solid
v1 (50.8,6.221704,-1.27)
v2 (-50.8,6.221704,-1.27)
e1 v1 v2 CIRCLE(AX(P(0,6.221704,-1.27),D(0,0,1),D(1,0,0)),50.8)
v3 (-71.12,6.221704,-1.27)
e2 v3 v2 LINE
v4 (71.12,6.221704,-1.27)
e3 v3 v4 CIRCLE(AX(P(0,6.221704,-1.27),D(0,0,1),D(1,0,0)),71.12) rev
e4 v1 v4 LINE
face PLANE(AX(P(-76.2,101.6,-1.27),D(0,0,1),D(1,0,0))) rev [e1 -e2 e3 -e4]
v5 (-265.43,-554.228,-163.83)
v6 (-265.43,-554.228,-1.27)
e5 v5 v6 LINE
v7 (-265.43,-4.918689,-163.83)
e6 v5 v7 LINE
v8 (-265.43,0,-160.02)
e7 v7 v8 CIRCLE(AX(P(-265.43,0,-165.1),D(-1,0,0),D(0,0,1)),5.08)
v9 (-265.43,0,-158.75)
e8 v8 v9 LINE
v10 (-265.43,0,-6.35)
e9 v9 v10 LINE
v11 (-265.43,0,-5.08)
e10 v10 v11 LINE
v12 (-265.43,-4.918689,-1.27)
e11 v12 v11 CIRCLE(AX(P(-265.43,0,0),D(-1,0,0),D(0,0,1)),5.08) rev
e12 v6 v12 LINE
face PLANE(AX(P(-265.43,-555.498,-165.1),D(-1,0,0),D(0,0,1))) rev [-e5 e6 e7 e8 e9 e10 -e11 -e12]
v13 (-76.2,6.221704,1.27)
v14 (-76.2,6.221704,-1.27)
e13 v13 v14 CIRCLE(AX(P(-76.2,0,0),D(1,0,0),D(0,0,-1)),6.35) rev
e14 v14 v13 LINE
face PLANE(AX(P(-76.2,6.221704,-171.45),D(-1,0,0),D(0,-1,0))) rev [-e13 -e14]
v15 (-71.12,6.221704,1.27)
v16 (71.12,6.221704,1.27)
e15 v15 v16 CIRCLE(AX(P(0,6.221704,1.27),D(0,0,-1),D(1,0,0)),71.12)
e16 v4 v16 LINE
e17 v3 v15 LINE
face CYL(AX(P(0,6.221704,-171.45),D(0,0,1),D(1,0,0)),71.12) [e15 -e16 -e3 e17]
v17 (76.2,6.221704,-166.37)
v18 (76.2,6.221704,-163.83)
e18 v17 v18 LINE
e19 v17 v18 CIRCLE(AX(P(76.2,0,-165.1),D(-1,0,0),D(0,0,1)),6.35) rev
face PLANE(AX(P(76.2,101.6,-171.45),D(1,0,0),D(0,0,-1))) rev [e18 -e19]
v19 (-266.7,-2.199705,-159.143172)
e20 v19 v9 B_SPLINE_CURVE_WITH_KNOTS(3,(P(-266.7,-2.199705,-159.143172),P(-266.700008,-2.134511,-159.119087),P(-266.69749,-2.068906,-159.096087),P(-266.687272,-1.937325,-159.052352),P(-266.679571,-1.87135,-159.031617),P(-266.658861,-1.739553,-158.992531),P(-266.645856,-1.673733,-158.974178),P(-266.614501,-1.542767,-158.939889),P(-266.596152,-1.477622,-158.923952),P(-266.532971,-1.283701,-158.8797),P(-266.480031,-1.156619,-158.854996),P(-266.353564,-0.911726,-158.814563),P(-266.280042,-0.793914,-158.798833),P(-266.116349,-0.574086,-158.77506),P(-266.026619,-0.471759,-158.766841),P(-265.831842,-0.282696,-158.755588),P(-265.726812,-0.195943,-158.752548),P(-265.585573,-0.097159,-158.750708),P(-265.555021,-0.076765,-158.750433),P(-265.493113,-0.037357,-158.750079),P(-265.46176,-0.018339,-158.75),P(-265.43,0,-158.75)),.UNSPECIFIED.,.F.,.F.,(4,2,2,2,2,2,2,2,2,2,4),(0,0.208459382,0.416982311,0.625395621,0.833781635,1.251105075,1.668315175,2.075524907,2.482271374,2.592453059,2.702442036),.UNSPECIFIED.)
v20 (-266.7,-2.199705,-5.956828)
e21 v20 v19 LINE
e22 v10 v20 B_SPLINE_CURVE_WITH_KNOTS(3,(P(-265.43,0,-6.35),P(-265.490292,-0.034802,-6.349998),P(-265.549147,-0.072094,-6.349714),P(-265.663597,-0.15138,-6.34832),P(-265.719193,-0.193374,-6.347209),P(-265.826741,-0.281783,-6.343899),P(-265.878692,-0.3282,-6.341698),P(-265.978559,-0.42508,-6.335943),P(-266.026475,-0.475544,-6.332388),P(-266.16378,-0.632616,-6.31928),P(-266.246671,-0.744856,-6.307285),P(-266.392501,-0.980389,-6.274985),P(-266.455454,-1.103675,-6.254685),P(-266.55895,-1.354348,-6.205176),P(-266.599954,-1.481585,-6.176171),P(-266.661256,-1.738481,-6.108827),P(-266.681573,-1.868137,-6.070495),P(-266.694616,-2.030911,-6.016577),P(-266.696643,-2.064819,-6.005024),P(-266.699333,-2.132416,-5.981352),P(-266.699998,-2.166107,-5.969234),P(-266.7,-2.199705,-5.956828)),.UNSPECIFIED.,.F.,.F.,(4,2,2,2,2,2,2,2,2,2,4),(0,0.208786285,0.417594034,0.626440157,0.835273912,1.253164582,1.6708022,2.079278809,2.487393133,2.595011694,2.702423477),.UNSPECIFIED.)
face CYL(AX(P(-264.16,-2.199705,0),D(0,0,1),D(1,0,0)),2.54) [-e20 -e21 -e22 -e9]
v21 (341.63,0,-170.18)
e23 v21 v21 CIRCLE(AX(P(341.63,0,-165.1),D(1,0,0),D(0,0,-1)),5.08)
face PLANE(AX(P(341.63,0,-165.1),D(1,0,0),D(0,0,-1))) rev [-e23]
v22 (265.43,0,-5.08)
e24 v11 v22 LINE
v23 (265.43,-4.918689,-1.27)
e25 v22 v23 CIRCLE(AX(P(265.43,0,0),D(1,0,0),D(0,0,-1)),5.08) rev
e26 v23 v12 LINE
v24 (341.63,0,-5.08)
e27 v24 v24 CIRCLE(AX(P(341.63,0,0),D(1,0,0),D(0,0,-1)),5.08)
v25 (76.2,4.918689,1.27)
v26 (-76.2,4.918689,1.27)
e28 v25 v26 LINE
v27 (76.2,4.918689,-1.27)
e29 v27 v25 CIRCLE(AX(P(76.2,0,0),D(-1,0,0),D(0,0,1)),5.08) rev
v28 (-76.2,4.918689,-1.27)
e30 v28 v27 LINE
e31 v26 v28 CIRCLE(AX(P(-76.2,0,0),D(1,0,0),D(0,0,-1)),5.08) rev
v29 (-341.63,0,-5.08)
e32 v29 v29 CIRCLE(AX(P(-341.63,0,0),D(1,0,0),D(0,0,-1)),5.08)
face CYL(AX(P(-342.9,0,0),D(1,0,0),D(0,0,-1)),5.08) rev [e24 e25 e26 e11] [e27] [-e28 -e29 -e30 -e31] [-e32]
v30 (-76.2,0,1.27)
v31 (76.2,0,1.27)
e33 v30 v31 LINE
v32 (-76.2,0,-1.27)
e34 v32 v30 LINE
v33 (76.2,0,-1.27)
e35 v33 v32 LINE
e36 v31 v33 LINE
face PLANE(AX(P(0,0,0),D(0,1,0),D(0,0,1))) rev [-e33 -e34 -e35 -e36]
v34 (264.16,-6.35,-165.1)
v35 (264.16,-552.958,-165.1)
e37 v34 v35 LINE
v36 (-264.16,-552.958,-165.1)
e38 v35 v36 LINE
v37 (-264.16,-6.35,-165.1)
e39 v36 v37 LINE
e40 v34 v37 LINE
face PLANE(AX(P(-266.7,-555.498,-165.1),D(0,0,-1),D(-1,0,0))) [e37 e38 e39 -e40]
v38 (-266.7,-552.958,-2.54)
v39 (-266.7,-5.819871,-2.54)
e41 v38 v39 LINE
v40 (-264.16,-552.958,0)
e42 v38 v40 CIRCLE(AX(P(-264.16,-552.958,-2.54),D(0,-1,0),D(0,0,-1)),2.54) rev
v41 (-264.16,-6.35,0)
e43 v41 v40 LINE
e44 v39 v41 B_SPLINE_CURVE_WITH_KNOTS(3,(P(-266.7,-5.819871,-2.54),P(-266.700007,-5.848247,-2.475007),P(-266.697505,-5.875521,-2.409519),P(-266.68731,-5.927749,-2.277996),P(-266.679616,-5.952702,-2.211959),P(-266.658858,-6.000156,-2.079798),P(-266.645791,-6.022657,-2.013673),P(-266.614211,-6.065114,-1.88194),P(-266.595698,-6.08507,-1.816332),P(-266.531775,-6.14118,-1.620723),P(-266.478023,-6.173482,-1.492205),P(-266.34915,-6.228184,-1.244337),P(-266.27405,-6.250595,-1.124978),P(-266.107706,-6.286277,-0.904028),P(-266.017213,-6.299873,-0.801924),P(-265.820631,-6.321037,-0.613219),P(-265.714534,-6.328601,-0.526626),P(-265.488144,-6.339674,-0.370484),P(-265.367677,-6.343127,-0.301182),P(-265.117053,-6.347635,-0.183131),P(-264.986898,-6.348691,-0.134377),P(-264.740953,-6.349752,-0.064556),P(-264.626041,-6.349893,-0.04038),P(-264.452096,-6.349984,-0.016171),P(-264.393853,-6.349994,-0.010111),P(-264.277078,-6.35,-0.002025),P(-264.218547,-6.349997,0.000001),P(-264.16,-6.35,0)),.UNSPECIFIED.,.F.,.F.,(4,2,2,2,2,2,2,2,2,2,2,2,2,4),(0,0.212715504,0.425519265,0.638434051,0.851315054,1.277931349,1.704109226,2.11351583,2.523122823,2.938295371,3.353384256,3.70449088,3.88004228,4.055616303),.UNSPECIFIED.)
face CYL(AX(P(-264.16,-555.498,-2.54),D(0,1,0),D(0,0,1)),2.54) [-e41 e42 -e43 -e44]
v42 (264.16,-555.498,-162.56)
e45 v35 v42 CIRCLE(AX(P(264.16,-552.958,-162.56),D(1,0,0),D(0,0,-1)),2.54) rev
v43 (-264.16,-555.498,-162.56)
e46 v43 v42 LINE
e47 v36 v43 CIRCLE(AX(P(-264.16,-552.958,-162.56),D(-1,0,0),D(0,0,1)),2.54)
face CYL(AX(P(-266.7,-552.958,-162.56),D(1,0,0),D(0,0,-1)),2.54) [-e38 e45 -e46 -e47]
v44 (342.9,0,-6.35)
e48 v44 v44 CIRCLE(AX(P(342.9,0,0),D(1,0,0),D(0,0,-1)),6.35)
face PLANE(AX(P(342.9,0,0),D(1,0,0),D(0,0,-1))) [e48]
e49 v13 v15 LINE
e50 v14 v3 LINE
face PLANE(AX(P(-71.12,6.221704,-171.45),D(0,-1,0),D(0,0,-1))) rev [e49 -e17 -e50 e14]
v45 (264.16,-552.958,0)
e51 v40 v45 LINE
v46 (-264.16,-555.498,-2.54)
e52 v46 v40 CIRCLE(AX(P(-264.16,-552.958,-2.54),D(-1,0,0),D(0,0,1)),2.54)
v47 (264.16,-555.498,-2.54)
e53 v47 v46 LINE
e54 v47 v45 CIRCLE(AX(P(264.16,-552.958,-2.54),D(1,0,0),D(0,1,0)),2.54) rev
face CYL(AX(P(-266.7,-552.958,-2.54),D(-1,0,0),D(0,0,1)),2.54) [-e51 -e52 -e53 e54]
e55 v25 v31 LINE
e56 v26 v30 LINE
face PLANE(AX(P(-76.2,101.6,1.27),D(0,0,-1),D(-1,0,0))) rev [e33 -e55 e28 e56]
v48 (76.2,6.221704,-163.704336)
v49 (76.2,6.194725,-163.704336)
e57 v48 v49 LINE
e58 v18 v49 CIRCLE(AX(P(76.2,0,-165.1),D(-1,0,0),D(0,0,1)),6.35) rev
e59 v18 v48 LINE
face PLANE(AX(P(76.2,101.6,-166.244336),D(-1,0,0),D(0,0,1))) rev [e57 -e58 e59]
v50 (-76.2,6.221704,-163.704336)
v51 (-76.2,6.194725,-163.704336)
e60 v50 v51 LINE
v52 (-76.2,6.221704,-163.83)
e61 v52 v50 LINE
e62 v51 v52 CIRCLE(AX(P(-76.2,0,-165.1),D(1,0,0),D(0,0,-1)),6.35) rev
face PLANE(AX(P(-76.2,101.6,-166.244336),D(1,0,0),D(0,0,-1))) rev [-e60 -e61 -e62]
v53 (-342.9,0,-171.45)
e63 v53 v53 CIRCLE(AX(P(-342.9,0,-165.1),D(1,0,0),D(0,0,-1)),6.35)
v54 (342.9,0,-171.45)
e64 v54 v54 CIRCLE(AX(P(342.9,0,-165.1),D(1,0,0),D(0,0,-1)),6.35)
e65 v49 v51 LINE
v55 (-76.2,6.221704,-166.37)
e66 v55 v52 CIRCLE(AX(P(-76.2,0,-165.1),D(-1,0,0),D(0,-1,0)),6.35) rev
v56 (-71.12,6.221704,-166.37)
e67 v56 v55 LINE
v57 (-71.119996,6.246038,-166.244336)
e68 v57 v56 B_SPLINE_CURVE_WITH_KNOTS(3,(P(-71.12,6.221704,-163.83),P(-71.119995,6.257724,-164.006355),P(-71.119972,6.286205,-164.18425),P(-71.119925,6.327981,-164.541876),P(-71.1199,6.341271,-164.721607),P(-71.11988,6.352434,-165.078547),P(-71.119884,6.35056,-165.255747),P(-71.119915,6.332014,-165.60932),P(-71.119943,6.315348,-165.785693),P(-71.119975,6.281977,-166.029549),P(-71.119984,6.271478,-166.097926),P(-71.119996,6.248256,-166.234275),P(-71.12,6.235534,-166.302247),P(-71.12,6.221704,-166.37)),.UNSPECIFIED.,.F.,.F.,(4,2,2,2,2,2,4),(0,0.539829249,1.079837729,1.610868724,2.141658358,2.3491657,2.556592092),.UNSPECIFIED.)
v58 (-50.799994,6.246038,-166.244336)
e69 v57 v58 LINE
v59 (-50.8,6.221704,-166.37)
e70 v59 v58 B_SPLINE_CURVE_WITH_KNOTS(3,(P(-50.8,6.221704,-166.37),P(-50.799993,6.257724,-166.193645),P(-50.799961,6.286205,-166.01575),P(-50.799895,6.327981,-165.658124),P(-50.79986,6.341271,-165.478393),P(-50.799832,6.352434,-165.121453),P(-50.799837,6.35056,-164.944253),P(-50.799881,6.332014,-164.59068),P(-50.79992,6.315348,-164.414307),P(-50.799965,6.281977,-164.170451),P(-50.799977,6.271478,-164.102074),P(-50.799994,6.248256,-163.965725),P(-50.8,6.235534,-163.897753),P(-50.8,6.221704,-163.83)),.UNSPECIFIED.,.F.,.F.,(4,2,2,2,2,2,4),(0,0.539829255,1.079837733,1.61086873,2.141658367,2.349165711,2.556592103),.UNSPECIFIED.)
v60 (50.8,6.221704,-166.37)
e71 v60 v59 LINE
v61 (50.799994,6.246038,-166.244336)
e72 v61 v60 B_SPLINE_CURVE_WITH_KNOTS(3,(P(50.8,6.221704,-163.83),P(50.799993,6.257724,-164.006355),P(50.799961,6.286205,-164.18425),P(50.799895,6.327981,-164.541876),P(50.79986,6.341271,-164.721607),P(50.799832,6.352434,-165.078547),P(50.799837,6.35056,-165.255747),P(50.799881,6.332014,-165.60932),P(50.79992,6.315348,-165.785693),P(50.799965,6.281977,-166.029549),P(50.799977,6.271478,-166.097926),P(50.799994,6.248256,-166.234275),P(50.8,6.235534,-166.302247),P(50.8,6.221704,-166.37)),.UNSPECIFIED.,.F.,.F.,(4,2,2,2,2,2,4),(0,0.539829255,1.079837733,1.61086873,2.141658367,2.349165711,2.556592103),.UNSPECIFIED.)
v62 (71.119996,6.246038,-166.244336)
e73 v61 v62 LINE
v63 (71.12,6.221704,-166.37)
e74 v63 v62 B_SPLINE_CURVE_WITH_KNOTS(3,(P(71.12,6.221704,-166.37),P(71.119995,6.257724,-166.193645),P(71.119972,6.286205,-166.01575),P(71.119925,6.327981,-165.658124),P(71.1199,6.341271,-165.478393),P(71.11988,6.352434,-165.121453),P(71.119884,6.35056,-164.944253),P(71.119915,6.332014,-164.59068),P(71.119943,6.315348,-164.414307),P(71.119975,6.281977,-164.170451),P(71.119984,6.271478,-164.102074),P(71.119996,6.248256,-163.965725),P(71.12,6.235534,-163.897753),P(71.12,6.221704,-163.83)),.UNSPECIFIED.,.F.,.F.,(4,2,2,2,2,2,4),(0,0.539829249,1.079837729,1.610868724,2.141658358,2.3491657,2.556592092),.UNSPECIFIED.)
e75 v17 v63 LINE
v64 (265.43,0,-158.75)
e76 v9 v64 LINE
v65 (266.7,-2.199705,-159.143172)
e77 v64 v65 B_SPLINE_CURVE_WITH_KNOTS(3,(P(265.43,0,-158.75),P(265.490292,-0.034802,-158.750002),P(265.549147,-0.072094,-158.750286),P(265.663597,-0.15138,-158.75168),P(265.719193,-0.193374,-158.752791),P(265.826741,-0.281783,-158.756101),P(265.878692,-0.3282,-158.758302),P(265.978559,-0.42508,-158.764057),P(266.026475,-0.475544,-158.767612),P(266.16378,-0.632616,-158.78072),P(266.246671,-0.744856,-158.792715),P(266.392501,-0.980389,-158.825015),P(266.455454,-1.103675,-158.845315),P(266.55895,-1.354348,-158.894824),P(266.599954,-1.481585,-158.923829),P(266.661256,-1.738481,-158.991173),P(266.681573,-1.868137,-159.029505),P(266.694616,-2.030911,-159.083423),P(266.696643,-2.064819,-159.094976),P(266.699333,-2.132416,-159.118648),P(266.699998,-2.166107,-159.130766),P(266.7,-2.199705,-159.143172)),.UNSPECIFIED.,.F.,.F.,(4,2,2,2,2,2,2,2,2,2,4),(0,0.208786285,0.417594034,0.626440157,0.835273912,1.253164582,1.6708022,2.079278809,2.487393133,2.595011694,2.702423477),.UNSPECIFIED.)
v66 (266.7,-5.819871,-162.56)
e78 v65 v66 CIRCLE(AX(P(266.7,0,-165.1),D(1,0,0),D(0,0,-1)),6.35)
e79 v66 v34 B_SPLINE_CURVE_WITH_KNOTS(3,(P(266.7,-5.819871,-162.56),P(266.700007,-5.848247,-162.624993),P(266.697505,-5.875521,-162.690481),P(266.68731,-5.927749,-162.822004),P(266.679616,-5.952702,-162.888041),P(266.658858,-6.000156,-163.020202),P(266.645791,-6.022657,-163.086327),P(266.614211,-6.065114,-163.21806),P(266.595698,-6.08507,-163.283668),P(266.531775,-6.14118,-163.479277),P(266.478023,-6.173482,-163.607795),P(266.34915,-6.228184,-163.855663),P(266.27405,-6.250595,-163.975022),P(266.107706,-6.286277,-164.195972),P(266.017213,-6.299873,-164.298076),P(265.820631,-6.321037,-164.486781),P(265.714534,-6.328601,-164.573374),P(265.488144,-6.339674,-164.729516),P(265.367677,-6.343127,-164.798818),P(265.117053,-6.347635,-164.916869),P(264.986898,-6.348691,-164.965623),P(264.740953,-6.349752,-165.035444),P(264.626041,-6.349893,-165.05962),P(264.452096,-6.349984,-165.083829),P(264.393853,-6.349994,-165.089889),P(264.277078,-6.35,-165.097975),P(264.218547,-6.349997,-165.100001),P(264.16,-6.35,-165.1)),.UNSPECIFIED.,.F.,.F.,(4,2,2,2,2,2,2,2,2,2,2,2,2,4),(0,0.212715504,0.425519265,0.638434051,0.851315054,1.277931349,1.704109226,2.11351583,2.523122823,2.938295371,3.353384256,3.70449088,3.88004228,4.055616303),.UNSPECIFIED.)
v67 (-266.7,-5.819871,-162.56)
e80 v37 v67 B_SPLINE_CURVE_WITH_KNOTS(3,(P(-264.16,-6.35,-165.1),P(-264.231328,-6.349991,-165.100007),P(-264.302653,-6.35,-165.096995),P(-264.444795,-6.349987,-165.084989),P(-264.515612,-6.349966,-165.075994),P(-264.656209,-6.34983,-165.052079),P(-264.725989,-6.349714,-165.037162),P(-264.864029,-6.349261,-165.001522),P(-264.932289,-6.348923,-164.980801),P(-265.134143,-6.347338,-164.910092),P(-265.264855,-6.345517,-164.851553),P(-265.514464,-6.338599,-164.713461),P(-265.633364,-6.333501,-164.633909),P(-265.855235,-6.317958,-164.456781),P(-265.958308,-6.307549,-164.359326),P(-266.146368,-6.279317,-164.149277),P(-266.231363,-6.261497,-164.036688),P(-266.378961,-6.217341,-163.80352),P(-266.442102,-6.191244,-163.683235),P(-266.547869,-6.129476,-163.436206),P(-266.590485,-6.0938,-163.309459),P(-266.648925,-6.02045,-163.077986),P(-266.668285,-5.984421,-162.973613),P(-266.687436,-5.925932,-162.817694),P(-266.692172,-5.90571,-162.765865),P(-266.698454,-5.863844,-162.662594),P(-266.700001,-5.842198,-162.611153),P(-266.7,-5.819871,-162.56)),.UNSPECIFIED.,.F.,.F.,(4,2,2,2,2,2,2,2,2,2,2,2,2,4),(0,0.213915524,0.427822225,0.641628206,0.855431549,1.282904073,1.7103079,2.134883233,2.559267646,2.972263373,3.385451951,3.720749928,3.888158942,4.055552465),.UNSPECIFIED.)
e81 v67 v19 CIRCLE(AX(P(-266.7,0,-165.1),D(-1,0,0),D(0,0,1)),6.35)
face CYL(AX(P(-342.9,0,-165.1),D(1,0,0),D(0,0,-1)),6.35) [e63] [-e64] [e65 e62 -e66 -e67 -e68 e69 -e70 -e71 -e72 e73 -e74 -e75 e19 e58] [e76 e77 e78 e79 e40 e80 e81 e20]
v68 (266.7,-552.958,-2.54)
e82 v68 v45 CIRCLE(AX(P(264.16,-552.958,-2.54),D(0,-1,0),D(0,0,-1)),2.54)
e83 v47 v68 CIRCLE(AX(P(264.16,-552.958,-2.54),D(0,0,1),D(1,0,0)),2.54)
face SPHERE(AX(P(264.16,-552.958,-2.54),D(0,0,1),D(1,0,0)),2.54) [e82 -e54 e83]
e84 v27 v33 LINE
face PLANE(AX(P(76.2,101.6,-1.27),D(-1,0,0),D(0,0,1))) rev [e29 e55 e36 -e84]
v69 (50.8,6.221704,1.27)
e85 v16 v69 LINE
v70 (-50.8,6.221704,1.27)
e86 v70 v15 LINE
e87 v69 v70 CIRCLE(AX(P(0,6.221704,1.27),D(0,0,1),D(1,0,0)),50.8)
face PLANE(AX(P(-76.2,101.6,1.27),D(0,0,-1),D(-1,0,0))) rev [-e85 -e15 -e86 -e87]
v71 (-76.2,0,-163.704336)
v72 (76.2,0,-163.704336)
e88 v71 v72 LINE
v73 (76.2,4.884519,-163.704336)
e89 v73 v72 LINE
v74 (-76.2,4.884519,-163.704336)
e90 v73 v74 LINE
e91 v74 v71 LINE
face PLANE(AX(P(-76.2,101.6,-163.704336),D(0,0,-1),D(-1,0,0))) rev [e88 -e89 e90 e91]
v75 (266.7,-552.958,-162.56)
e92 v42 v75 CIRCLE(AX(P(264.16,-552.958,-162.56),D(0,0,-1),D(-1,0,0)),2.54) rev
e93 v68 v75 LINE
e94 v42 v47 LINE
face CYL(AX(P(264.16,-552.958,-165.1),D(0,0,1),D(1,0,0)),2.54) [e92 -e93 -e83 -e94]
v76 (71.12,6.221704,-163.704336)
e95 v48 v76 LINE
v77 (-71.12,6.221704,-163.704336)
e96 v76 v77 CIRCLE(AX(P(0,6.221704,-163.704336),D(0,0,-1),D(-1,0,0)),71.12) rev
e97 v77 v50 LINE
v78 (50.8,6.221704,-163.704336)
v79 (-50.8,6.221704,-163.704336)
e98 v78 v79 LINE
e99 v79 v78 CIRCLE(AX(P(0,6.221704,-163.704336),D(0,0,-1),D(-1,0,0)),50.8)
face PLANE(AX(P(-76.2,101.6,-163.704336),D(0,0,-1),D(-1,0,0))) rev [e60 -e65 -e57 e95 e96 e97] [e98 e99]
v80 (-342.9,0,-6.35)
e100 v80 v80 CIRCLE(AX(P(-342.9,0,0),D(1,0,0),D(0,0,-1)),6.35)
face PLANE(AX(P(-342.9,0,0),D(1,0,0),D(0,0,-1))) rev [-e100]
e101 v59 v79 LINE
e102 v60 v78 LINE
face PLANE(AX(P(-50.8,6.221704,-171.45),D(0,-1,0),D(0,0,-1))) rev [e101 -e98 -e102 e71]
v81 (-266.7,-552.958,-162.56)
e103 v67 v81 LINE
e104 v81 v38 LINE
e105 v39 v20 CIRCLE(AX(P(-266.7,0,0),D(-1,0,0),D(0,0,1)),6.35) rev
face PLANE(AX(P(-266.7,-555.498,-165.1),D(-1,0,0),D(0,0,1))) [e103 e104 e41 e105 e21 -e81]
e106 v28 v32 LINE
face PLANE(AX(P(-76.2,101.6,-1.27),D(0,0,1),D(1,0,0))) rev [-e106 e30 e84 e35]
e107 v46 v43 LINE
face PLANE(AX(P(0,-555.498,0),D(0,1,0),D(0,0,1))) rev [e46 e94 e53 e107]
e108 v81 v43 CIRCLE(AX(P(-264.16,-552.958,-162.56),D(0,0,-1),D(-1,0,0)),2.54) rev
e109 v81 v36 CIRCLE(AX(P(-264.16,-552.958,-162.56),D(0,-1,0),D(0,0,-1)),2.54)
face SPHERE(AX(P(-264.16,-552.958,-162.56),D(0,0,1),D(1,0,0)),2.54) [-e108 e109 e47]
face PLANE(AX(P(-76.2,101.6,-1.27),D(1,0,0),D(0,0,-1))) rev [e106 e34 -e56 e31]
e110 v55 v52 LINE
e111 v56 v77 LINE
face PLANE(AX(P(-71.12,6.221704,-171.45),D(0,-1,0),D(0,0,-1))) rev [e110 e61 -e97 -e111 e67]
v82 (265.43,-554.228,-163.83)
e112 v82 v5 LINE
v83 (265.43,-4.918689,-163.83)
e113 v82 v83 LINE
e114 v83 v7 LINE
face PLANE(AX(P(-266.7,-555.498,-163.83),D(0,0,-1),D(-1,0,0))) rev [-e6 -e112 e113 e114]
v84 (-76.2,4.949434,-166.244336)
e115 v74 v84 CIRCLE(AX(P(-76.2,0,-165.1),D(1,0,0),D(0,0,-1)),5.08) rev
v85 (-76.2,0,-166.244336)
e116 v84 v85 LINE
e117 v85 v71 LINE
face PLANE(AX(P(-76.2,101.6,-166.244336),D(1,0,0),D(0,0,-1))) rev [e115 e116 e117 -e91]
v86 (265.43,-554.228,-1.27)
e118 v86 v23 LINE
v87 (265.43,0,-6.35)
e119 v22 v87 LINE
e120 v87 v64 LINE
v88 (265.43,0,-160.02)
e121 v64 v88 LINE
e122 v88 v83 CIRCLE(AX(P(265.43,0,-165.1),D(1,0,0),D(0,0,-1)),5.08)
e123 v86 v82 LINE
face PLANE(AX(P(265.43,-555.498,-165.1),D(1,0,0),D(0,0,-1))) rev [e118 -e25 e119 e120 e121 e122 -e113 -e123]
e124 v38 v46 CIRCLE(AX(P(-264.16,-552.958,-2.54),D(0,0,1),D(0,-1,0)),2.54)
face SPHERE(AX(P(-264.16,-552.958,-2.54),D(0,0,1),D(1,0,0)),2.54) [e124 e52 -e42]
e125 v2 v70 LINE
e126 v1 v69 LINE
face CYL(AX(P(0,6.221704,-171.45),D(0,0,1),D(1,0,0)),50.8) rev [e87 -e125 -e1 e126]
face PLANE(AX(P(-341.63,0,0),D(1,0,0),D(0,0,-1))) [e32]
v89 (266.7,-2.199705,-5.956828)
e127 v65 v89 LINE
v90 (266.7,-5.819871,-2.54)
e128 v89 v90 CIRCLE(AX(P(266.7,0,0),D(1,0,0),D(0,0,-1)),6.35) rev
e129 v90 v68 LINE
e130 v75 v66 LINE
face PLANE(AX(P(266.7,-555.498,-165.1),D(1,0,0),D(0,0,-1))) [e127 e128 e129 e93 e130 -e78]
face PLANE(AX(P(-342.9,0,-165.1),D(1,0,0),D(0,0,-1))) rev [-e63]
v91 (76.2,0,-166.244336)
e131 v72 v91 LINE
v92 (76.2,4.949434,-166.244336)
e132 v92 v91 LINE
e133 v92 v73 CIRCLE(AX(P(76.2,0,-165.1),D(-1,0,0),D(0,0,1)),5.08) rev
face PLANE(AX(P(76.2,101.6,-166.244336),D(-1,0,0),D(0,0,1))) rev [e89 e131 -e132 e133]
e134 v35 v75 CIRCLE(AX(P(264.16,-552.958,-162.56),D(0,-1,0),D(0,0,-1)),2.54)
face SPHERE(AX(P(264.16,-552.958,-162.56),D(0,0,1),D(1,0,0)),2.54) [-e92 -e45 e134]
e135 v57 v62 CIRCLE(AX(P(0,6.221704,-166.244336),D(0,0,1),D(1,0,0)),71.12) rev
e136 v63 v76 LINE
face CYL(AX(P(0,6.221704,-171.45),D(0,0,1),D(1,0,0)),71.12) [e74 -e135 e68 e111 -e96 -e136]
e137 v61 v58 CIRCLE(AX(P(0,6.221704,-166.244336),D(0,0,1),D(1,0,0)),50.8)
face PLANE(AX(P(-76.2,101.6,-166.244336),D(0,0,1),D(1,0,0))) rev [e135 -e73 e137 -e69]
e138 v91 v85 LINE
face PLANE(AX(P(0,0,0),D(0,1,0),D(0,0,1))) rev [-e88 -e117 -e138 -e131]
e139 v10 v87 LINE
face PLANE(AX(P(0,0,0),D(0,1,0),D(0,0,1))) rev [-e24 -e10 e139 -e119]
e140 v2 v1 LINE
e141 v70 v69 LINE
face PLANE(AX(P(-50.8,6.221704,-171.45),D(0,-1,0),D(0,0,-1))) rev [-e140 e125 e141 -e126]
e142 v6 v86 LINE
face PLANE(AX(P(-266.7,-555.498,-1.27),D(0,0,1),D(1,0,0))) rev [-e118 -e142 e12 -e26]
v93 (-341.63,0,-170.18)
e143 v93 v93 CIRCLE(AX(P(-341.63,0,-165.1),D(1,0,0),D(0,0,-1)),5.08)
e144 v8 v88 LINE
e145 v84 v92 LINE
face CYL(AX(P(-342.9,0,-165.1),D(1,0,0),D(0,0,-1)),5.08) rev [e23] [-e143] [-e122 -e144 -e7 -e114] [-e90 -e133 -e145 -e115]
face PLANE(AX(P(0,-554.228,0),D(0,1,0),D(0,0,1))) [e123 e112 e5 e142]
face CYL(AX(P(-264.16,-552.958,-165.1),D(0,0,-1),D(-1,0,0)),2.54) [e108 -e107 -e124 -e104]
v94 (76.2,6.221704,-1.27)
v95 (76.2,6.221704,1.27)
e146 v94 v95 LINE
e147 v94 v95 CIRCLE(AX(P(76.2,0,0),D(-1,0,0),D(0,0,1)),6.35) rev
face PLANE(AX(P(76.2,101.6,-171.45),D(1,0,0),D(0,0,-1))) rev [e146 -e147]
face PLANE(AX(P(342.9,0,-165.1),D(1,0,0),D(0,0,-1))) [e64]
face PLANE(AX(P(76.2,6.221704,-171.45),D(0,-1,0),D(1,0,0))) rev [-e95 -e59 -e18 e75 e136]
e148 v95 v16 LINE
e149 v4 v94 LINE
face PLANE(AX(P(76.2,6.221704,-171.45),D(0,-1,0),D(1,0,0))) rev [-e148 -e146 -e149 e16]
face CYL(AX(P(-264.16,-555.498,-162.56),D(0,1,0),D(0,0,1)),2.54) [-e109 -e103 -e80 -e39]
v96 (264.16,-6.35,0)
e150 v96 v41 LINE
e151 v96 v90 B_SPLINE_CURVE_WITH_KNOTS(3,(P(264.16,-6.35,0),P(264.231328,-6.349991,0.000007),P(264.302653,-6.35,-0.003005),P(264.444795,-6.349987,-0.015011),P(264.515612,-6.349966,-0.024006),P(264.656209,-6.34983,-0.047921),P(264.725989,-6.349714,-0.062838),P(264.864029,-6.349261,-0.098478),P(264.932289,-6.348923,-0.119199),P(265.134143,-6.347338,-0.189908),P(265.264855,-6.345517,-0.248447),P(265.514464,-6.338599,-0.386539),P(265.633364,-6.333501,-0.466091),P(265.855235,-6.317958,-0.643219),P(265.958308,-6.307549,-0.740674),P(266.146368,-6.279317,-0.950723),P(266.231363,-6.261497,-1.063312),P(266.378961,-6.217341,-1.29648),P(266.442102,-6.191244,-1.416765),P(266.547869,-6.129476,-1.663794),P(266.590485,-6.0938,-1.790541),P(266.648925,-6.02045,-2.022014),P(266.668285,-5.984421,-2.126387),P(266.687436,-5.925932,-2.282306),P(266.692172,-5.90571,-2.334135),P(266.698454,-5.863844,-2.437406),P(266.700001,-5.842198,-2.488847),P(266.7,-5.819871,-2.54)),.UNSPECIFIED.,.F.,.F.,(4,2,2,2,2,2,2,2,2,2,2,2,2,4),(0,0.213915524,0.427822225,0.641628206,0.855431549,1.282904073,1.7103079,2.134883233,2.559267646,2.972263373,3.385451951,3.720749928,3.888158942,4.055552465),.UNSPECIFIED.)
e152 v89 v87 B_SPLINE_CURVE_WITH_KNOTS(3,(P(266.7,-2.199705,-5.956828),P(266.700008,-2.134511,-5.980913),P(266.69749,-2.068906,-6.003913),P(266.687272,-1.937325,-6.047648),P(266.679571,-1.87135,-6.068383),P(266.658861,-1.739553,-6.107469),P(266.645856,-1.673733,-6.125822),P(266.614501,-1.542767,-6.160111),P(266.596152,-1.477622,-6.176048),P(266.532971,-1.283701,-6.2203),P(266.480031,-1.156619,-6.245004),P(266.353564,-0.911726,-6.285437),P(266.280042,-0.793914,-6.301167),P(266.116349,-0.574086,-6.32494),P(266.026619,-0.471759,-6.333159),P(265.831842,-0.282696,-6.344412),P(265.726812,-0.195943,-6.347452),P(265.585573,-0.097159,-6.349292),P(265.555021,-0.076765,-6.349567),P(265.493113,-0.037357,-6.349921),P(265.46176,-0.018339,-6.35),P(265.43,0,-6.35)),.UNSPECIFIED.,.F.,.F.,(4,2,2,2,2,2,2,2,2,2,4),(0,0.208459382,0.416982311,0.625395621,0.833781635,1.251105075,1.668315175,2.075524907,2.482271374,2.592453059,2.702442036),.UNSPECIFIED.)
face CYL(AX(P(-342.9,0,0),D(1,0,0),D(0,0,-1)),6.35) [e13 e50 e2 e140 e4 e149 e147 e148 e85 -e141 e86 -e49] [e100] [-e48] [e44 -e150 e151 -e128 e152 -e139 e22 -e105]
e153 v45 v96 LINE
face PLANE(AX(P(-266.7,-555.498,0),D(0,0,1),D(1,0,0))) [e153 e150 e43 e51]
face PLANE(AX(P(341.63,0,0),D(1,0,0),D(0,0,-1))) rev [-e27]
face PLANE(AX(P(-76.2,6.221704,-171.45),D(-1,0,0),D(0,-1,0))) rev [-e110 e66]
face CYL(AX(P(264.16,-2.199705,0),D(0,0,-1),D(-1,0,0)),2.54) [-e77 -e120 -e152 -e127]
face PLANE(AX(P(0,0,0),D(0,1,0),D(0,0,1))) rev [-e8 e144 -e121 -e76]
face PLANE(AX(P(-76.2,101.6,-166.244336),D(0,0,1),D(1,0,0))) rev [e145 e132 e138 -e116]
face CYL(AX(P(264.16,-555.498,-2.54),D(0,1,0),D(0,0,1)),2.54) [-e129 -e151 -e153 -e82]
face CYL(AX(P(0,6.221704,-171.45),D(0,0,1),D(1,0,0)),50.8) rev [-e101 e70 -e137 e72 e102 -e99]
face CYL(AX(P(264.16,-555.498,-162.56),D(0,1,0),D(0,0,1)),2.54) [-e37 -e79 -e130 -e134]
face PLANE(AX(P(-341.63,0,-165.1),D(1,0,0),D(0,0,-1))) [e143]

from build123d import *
from build123d.topology import SkipClean

# Parameters (mm, degrees)
SALIENTE_EXTRUIR3_DEPTH        = 342.9
SALIENTE_EXTRUIR3_DEPTH_BACK   = 342.9
CROQUIS3_R                     = 6.35
SALIENTE_EXTRUIR3_2_DEPTH      = 342.9
SALIENTE_EXTRUIR3_2_DEPTH_BACK = 342.9
CROQUIS4_W                     = 533.4
CROQUIS4_H                     = 165.1
SALIENTE_EXTRUIR4_DEPTH        = 555.498
VACIADO3_START                 = -265.43
VACIADO3_DEPTH                 = 530.86
VACIADO3_START_2               = -341.63
VACIADO3_2_OUTLINE_R           = 5.08
VACIADO3_2_DEPTH               = 683.26
REDONDEO5_R                    = 2.54
CROQUIS5_W                     = 152.4
CROQUIS5_H                     = 2.54
SALIENTE_EXTRUIR5_DEPTH        = 101.6
CORTAR_EXTRUIR2_DEPTH          = 676.270787465
CORTAR_EXTRUIR8_DEPTH          = 676.270787542


# Read off the part's stored shape, not the designer's step: Vaciado3
with BuildPart() as part:
    # Croquis3 → Saliente-Extruir3 (new, two sides: drawn at the far end of the back side and taken through both)
    with BuildSketch(Plane(origin=(0, 0, 0), x_dir=(0, 0, -1), z_dir=(1, 0, 0)).offset(-SALIENTE_EXTRUIR3_DEPTH_BACK)):
        Circle(CROQUIS3_R)
    extrude(amount=SALIENTE_EXTRUIR3_DEPTH + SALIENTE_EXTRUIR3_DEPTH_BACK)



with BuildPart() as body_2:
    # Croquis3 → Saliente-Extruir3 2 (new, two sides: drawn at the far end of the back side and taken through both)
    with BuildSketch(Plane(origin=(0, 0, 0), x_dir=(0, 0, -1), z_dir=(1, 0, 0)).offset(-SALIENTE_EXTRUIR3_2_DEPTH_BACK)):
        with Locations((165.1, 0)):
            Circle(CROQUIS3_R)
    extrude(amount=SALIENTE_EXTRUIR3_2_DEPTH + SALIENTE_EXTRUIR3_2_DEPTH_BACK)


with BuildPart() as part_1:
    add(part.part)

    add(body_2.part)  # Saliente-Extruir4 merges body 2
    # Croquis4 → Saliente-Extruir4 (add)
    with BuildSketch(Plane(origin=(0, 0, 0), x_dir=(1, 0, 0), z_dir=(0, 1, 0))):
        with Locations((0, 82.55)):
            Rectangle(CROQUIS4_W, CROQUIS4_H)
    extrude(amount=-SALIENTE_EXTRUIR4_DEPTH)

    # Vaciado3 outline → Vaciado3 (cut)
    with BuildSketch(Plane.YZ.offset(VACIADO3_START)):
        with BuildLine():
            Line((-554.228, -163.83), (-4.91868885, -163.83))
            ThreePointArc((-4.91868885, -163.83), (3.110851973, -169.116092628), (0, -160.02))
            Line((0, -160.02), (0, -5.08))
            ThreePointArc((0, -5.08), (3.110851973, 4.016092628), (-4.91868885, -1.27))
            Line((-4.91868885, -1.27), (-554.228, -1.27))
            Line((-554.228, -1.27), (-554.228, -163.83))
        make_face()
    extrude(amount=VACIADO3_DEPTH, mode=Mode.SUBTRACT)

    # Vaciado3 2 outline → Vaciado3 2 (cut)
    with BuildSketch(Plane.YZ.offset(VACIADO3_START_2)):
        with Locations((0, -165.1)):
            Circle(VACIADO3_2_OUTLINE_R)
        Circle(VACIADO3_2_OUTLINE_R)
    extrude(amount=VACIADO3_2_DEPTH, mode=Mode.SUBTRACT)

    # Redondeo5
    # the kernel refuses this fillet: 2.54 mm, written as the material it takes off along each edge
    with BuildSketch(Plane(origin=(-264.16, -552.958, -2.54), x_dir=(0, 0, 1), z_dir=(-1, 0, 0))) as redondeo5_piece_1_section:
        Polygon((0, 0), (REDONDEO5_R * 1.02, 0), (REDONDEO5_R * 1.02, -REDONDEO5_R * 1.02), (0, -REDONDEO5_R * 1.02), align=None)
    redondeo5_piece_1 = extrude(amount=REDONDEO5_R * 1.02, mode=Mode.PRIVATE)
    redondeo5_piece_1 = redondeo5_piece_1 - Plane(origin=(-264.16, -552.958, -2.54), x_dir=(0, 0.7071067811865475, -0.7071067811865475), z_dir=(-1, 0, 0)) * Sphere(REDONDEO5_R, mode=Mode.PRIVATE)
    add(redondeo5_piece_1, mode=Mode.SUBTRACT)
    with BuildSketch(Plane(origin=(-264.16, -552.958, -162.56), x_dir=(0, -1, 0), z_dir=(-1, 0, 0))) as redondeo5_piece_2_section:
        Polygon((0, 0), (REDONDEO5_R * 1.02, 0), (REDONDEO5_R * 1.02, -REDONDEO5_R * 1.02), (0, -REDONDEO5_R * 1.02), align=None)
    redondeo5_piece_2 = extrude(amount=REDONDEO5_R * 1.02, mode=Mode.PRIVATE)
    redondeo5_piece_2 = redondeo5_piece_2 - Plane(origin=(-264.16, -552.958, -162.56), x_dir=(0, 0.7071067811865475, 0.7071067811865475), z_dir=(-1, 0, 0)) * Sphere(REDONDEO5_R, mode=Mode.PRIVATE)
    add(redondeo5_piece_2, mode=Mode.SUBTRACT)
    with BuildSketch(Plane(origin=(264.16, -552.958, -2.54), x_dir=(1, 0, 0), z_dir=(0, 0, 1))) as redondeo5_piece_3_section:
        Polygon((0, 0), (REDONDEO5_R * 1.02, 0), (REDONDEO5_R * 1.02, -REDONDEO5_R * 1.02), (0, -REDONDEO5_R * 1.02), align=None)
    redondeo5_piece_3 = extrude(amount=REDONDEO5_R * 1.02, mode=Mode.PRIVATE)
    redondeo5_piece_3 = redondeo5_piece_3 - Plane(origin=(264.16, -552.958, -2.54), x_dir=(-0.7071067811865475, 0.7071067811865475, 0), z_dir=(0, 0, 1)) * Sphere(REDONDEO5_R, mode=Mode.PRIVATE)
    add(redondeo5_piece_3, mode=Mode.SUBTRACT)
    with BuildSketch(Plane(origin=(264.16, -552.958, -162.56), x_dir=(1, 0, 0), z_dir=(0, -1, 0))) as redondeo5_piece_4_section:
        Polygon((0, 0), (REDONDEO5_R * 1.02, 0), (REDONDEO5_R * 1.02, -REDONDEO5_R * 1.02), (0, -REDONDEO5_R * 1.02), align=None)
    redondeo5_piece_4 = extrude(amount=REDONDEO5_R * 1.02, mode=Mode.PRIVATE)
    redondeo5_piece_4 = redondeo5_piece_4 - Plane(origin=(264.16, -552.958, -162.56), x_dir=(-0.7071067811865474, 0, 0.7071067811865477), z_dir=(0, -1, 0)) * Sphere(REDONDEO5_R, mode=Mode.PRIVATE)
    add(redondeo5_piece_4, mode=Mode.SUBTRACT)
    with BuildSketch(Plane(origin=(266.7, 0, -164.249261314), x_dir=(0, -1, 0), z_dir=(0, 0, 1))) as redondeo5_piece_5_section:
        with BuildLine():
            CenterArc((2.199704526, -2.54), REDONDEO5_R, 90, 60)
            Line((0, -1.27), (0, 0))
            Line((0, 0), (2.199704526, 0))
        make_face()
    redondeo5_piece_5 = extrude(amount=163.398522628, mode=Mode.PRIVATE)
    redondeo5_piece_5 = redondeo5_piece_5 - Plane(origin=(266.364103935, 0, 0), x_dir=(0, 0, -1), z_dir=(-1, 0, 0)) * Cylinder(6.35, 336, mode=Mode.PRIVATE)
    redondeo5_piece_5 = redondeo5_piece_5 - Plane(origin=(266.364103935, 0, -165.1), x_dir=(0, 0, -1), z_dir=(-1, 0, 0)) * Cylinder(6.35, 336, mode=Mode.PRIVATE)
    add(redondeo5_piece_5, mode=Mode.SUBTRACT)
    with BuildSketch(Plane(origin=(-266.7, 0, -0.850738686), x_dir=(1, 0, 0), z_dir=(0, 0, -1))) as redondeo5_piece_6_section:
        with BuildLine():
            CenterArc((2.54, 2.199704526), REDONDEO5_R, 180, 60)
            Line((0, 2.199704526), (0, 0))
            Line((0, 0), (1.27, 0))
        make_face()
    redondeo5_piece_6 = extrude(amount=163.398522628, mode=Mode.PRIVATE)
    redondeo5_piece_6 = redondeo5_piece_6 - Plane(origin=(-266.364103935, 0, 0), x_dir=(0, 0, -1), z_dir=(-1, 0, 0)) * Cylinder(6.35, 336, mode=Mode.PRIVATE)
    redondeo5_piece_6 = redondeo5_piece_6 - Plane(origin=(-266.364103935, 0, -165.1), x_dir=(0, 0, -1), z_dir=(-1, 0, 0)) * Cylinder(6.35, 336, mode=Mode.PRIVATE)
    add(redondeo5_piece_6, mode=Mode.SUBTRACT)
    with BuildSketch(Plane(origin=(-266.7, 0, 0), x_dir=(1, 0, 0), z_dir=(0, -1, 0))) as redondeo5_piece_7_section:
        with BuildLine():
            CenterArc((REDONDEO5_R, -REDONDEO5_R), REDONDEO5_R, 90, 90)
            Line((0, -REDONDEO5_R), (0, 0))
            Line((0, 0), (REDONDEO5_R, 0))
        make_face()
    redondeo5_piece_7 = extrude(amount=552.958, mode=Mode.PRIVATE)
    redondeo5_piece_7 = redondeo5_piece_7 - Plane(origin=(-266.132673367, 0, 0), x_dir=(0, 0, -1), z_dir=(-1, 0, 0)) * Cylinder(6.35, 1117, mode=Mode.PRIVATE)
    add(redondeo5_piece_7, mode=Mode.SUBTRACT)
    with BuildSketch(Plane(origin=(-266.7, -555.498, -2.54), x_dir=(0, 1, 0), z_dir=(0, 0, -1)), Plane(origin=(266.7, -555.498, -162.56), x_dir=(0, 1, 0), z_dir=(0, 0, 1))) as redondeo5_piece_8:
        with BuildLine():
            CenterArc((REDONDEO5_R, REDONDEO5_R), REDONDEO5_R, 180, 90)
            Line((0, REDONDEO5_R), (0, 0))
            Line((0, 0), (REDONDEO5_R, 0))
        make_face()
    extrude(amount=160.02, mode=Mode.SUBTRACT)
    with BuildSketch(Plane(origin=(-266.7, 0, -165.1), x_dir=(0, 0, 1), z_dir=(0, -1, 0))) as redondeo5_piece_9_section:
        with BuildLine():
            CenterArc((REDONDEO5_R, -REDONDEO5_R), REDONDEO5_R, 90, 90)
            Line((0, -REDONDEO5_R), (0, 0))
            Line((0, 0), (REDONDEO5_R, 0))
        make_face()
    redondeo5_piece_9 = extrude(amount=552.958, mode=Mode.PRIVATE)
    redondeo5_piece_9 = redondeo5_piece_9 - Plane(origin=(-266.132672665, 0, -165.1), x_dir=(0, 0, -1), z_dir=(-1, 0, 0)) * Cylinder(6.35, 1117, mode=Mode.PRIVATE)
    add(redondeo5_piece_9, mode=Mode.SUBTRACT)
    with BuildSketch(Plane(origin=(266.7, 0, 0), x_dir=(-1, 0, 0), z_dir=(0, -1, 0))) as redondeo5_piece_10_section:
        with BuildLine():
            CenterArc((REDONDEO5_R, REDONDEO5_R), REDONDEO5_R, 180, 90)
            Line((0, REDONDEO5_R), (0, 0))
            Line((0, 0), (REDONDEO5_R, 0))
        make_face()
    redondeo5_piece_10 = extrude(amount=552.958, mode=Mode.PRIVATE)
    redondeo5_piece_10 = redondeo5_piece_10 - Plane(origin=(266.132673367, 0, 0), x_dir=(0, 0, -1), z_dir=(-1, 0, 0)) * Cylinder(6.35, 1117, mode=Mode.PRIVATE)
    add(redondeo5_piece_10, mode=Mode.SUBTRACT)
    with BuildSketch(Plane(origin=(264.16, -555.498, 0), x_dir=(0, 1, 0), z_dir=(-1, 0, 0))) as redondeo5_piece_11:
        with BuildLine():
            CenterArc((REDONDEO5_R, REDONDEO5_R), REDONDEO5_R, 180, 90)
            Line((0, REDONDEO5_R), (0, 0))
            Line((0, 0), (REDONDEO5_R, 0))
        make_face()
    extrude(amount=528.32, mode=Mode.SUBTRACT)
    with BuildSketch(Plane(origin=(-264.16, -555.498, -165.1), x_dir=(0, 0, 1), z_dir=(1, 0, 0))) as redondeo5_piece_12:
        with BuildLine():
            CenterArc((REDONDEO5_R, -REDONDEO5_R), REDONDEO5_R, 90, 90)
            Line((0, -REDONDEO5_R), (0, 0))
            Line((0, 0), (REDONDEO5_R, 0))
        make_face()
    extrude(amount=528.32, mode=Mode.SUBTRACT)
    with BuildSketch(Plane(origin=(266.7, 0, -165.1), x_dir=(0, 0, 1), z_dir=(0, -1, 0))) as redondeo5_piece_13_section:
        with BuildLine():
            CenterArc((REDONDEO5_R, REDONDEO5_R), REDONDEO5_R, 180, 90)
            Line((0, REDONDEO5_R), (0, 0))
            Line((0, 0), (REDONDEO5_R, 0))
        make_face()
    redondeo5_piece_13 = extrude(amount=552.958, mode=Mode.PRIVATE)
    redondeo5_piece_13 = redondeo5_piece_13 - Plane(origin=(266.132672665, 0, -165.1), x_dir=(0, 0, -1), z_dir=(-1, 0, 0)) * Cylinder(6.35, 1117, mode=Mode.PRIVATE)
    add(redondeo5_piece_13, mode=Mode.SUBTRACT)

    # Croquis5 → Saliente-Extruir5 (add)
    with SkipClean():  # the faces are left unmerged after this step: merging them gives an invalid solid
        with BuildSketch(Plane(origin=(0, 0, 0), x_dir=(1, 0, 0), z_dir=(0, 1, 0))):
            with Locations((0, 164.974335694)):
                Rectangle(CROQUIS5_W, CROQUIS5_H)
            Rectangle(CROQUIS5_W, CROQUIS5_H)
        extrude(amount=SALIENTE_EXTRUIR5_DEPTH)

    # Croquis6 → Cortar-Extruir2 (cut, through all)
    with SkipClean():  # the faces are left unmerged after this step: merging them gives an invalid solid
        with BuildSketch(Plane.XY.offset(1.27)):
            with BuildLine():
                Line((-50.8, 6.221703947), (50.8, 6.221703947))
                ThreePointArc((50.8, 6.221703947), (0, 57.021703947), (-50.8, 6.221703947))
            make_face()
        extrude(amount=-CORTAR_EXTRUIR2_DEPTH, mode=Mode.SUBTRACT)

    # Croquis7 → Cortar-Extruir8 (cut, through all)
    with SkipClean():  # the faces are left unmerged after this step: merging them gives an invalid solid
        with BuildSketch(Plane.XY.offset(1.27)):
            with BuildLine():
                Line((-71.12, 6.221703947), (-76.2, 6.221703947))
                Line((-76.2, 6.221703947), (-76.2, 101.6))
                Line((-76.2, 101.6), (76.2, 101.6))
                Line((76.2, 101.6), (76.2, 6.221703947))
                Line((76.2, 6.221703947), (71.12, 6.221703947))
                ThreePointArc((71.12, 6.221703947), (0, 77.341703947), (-71.12, 6.221703947))
            make_face()
        extrude(amount=-CORTAR_EXTRUIR8_DEPTH, mode=Mode.SUBTRACT)


solid = part_1.part
